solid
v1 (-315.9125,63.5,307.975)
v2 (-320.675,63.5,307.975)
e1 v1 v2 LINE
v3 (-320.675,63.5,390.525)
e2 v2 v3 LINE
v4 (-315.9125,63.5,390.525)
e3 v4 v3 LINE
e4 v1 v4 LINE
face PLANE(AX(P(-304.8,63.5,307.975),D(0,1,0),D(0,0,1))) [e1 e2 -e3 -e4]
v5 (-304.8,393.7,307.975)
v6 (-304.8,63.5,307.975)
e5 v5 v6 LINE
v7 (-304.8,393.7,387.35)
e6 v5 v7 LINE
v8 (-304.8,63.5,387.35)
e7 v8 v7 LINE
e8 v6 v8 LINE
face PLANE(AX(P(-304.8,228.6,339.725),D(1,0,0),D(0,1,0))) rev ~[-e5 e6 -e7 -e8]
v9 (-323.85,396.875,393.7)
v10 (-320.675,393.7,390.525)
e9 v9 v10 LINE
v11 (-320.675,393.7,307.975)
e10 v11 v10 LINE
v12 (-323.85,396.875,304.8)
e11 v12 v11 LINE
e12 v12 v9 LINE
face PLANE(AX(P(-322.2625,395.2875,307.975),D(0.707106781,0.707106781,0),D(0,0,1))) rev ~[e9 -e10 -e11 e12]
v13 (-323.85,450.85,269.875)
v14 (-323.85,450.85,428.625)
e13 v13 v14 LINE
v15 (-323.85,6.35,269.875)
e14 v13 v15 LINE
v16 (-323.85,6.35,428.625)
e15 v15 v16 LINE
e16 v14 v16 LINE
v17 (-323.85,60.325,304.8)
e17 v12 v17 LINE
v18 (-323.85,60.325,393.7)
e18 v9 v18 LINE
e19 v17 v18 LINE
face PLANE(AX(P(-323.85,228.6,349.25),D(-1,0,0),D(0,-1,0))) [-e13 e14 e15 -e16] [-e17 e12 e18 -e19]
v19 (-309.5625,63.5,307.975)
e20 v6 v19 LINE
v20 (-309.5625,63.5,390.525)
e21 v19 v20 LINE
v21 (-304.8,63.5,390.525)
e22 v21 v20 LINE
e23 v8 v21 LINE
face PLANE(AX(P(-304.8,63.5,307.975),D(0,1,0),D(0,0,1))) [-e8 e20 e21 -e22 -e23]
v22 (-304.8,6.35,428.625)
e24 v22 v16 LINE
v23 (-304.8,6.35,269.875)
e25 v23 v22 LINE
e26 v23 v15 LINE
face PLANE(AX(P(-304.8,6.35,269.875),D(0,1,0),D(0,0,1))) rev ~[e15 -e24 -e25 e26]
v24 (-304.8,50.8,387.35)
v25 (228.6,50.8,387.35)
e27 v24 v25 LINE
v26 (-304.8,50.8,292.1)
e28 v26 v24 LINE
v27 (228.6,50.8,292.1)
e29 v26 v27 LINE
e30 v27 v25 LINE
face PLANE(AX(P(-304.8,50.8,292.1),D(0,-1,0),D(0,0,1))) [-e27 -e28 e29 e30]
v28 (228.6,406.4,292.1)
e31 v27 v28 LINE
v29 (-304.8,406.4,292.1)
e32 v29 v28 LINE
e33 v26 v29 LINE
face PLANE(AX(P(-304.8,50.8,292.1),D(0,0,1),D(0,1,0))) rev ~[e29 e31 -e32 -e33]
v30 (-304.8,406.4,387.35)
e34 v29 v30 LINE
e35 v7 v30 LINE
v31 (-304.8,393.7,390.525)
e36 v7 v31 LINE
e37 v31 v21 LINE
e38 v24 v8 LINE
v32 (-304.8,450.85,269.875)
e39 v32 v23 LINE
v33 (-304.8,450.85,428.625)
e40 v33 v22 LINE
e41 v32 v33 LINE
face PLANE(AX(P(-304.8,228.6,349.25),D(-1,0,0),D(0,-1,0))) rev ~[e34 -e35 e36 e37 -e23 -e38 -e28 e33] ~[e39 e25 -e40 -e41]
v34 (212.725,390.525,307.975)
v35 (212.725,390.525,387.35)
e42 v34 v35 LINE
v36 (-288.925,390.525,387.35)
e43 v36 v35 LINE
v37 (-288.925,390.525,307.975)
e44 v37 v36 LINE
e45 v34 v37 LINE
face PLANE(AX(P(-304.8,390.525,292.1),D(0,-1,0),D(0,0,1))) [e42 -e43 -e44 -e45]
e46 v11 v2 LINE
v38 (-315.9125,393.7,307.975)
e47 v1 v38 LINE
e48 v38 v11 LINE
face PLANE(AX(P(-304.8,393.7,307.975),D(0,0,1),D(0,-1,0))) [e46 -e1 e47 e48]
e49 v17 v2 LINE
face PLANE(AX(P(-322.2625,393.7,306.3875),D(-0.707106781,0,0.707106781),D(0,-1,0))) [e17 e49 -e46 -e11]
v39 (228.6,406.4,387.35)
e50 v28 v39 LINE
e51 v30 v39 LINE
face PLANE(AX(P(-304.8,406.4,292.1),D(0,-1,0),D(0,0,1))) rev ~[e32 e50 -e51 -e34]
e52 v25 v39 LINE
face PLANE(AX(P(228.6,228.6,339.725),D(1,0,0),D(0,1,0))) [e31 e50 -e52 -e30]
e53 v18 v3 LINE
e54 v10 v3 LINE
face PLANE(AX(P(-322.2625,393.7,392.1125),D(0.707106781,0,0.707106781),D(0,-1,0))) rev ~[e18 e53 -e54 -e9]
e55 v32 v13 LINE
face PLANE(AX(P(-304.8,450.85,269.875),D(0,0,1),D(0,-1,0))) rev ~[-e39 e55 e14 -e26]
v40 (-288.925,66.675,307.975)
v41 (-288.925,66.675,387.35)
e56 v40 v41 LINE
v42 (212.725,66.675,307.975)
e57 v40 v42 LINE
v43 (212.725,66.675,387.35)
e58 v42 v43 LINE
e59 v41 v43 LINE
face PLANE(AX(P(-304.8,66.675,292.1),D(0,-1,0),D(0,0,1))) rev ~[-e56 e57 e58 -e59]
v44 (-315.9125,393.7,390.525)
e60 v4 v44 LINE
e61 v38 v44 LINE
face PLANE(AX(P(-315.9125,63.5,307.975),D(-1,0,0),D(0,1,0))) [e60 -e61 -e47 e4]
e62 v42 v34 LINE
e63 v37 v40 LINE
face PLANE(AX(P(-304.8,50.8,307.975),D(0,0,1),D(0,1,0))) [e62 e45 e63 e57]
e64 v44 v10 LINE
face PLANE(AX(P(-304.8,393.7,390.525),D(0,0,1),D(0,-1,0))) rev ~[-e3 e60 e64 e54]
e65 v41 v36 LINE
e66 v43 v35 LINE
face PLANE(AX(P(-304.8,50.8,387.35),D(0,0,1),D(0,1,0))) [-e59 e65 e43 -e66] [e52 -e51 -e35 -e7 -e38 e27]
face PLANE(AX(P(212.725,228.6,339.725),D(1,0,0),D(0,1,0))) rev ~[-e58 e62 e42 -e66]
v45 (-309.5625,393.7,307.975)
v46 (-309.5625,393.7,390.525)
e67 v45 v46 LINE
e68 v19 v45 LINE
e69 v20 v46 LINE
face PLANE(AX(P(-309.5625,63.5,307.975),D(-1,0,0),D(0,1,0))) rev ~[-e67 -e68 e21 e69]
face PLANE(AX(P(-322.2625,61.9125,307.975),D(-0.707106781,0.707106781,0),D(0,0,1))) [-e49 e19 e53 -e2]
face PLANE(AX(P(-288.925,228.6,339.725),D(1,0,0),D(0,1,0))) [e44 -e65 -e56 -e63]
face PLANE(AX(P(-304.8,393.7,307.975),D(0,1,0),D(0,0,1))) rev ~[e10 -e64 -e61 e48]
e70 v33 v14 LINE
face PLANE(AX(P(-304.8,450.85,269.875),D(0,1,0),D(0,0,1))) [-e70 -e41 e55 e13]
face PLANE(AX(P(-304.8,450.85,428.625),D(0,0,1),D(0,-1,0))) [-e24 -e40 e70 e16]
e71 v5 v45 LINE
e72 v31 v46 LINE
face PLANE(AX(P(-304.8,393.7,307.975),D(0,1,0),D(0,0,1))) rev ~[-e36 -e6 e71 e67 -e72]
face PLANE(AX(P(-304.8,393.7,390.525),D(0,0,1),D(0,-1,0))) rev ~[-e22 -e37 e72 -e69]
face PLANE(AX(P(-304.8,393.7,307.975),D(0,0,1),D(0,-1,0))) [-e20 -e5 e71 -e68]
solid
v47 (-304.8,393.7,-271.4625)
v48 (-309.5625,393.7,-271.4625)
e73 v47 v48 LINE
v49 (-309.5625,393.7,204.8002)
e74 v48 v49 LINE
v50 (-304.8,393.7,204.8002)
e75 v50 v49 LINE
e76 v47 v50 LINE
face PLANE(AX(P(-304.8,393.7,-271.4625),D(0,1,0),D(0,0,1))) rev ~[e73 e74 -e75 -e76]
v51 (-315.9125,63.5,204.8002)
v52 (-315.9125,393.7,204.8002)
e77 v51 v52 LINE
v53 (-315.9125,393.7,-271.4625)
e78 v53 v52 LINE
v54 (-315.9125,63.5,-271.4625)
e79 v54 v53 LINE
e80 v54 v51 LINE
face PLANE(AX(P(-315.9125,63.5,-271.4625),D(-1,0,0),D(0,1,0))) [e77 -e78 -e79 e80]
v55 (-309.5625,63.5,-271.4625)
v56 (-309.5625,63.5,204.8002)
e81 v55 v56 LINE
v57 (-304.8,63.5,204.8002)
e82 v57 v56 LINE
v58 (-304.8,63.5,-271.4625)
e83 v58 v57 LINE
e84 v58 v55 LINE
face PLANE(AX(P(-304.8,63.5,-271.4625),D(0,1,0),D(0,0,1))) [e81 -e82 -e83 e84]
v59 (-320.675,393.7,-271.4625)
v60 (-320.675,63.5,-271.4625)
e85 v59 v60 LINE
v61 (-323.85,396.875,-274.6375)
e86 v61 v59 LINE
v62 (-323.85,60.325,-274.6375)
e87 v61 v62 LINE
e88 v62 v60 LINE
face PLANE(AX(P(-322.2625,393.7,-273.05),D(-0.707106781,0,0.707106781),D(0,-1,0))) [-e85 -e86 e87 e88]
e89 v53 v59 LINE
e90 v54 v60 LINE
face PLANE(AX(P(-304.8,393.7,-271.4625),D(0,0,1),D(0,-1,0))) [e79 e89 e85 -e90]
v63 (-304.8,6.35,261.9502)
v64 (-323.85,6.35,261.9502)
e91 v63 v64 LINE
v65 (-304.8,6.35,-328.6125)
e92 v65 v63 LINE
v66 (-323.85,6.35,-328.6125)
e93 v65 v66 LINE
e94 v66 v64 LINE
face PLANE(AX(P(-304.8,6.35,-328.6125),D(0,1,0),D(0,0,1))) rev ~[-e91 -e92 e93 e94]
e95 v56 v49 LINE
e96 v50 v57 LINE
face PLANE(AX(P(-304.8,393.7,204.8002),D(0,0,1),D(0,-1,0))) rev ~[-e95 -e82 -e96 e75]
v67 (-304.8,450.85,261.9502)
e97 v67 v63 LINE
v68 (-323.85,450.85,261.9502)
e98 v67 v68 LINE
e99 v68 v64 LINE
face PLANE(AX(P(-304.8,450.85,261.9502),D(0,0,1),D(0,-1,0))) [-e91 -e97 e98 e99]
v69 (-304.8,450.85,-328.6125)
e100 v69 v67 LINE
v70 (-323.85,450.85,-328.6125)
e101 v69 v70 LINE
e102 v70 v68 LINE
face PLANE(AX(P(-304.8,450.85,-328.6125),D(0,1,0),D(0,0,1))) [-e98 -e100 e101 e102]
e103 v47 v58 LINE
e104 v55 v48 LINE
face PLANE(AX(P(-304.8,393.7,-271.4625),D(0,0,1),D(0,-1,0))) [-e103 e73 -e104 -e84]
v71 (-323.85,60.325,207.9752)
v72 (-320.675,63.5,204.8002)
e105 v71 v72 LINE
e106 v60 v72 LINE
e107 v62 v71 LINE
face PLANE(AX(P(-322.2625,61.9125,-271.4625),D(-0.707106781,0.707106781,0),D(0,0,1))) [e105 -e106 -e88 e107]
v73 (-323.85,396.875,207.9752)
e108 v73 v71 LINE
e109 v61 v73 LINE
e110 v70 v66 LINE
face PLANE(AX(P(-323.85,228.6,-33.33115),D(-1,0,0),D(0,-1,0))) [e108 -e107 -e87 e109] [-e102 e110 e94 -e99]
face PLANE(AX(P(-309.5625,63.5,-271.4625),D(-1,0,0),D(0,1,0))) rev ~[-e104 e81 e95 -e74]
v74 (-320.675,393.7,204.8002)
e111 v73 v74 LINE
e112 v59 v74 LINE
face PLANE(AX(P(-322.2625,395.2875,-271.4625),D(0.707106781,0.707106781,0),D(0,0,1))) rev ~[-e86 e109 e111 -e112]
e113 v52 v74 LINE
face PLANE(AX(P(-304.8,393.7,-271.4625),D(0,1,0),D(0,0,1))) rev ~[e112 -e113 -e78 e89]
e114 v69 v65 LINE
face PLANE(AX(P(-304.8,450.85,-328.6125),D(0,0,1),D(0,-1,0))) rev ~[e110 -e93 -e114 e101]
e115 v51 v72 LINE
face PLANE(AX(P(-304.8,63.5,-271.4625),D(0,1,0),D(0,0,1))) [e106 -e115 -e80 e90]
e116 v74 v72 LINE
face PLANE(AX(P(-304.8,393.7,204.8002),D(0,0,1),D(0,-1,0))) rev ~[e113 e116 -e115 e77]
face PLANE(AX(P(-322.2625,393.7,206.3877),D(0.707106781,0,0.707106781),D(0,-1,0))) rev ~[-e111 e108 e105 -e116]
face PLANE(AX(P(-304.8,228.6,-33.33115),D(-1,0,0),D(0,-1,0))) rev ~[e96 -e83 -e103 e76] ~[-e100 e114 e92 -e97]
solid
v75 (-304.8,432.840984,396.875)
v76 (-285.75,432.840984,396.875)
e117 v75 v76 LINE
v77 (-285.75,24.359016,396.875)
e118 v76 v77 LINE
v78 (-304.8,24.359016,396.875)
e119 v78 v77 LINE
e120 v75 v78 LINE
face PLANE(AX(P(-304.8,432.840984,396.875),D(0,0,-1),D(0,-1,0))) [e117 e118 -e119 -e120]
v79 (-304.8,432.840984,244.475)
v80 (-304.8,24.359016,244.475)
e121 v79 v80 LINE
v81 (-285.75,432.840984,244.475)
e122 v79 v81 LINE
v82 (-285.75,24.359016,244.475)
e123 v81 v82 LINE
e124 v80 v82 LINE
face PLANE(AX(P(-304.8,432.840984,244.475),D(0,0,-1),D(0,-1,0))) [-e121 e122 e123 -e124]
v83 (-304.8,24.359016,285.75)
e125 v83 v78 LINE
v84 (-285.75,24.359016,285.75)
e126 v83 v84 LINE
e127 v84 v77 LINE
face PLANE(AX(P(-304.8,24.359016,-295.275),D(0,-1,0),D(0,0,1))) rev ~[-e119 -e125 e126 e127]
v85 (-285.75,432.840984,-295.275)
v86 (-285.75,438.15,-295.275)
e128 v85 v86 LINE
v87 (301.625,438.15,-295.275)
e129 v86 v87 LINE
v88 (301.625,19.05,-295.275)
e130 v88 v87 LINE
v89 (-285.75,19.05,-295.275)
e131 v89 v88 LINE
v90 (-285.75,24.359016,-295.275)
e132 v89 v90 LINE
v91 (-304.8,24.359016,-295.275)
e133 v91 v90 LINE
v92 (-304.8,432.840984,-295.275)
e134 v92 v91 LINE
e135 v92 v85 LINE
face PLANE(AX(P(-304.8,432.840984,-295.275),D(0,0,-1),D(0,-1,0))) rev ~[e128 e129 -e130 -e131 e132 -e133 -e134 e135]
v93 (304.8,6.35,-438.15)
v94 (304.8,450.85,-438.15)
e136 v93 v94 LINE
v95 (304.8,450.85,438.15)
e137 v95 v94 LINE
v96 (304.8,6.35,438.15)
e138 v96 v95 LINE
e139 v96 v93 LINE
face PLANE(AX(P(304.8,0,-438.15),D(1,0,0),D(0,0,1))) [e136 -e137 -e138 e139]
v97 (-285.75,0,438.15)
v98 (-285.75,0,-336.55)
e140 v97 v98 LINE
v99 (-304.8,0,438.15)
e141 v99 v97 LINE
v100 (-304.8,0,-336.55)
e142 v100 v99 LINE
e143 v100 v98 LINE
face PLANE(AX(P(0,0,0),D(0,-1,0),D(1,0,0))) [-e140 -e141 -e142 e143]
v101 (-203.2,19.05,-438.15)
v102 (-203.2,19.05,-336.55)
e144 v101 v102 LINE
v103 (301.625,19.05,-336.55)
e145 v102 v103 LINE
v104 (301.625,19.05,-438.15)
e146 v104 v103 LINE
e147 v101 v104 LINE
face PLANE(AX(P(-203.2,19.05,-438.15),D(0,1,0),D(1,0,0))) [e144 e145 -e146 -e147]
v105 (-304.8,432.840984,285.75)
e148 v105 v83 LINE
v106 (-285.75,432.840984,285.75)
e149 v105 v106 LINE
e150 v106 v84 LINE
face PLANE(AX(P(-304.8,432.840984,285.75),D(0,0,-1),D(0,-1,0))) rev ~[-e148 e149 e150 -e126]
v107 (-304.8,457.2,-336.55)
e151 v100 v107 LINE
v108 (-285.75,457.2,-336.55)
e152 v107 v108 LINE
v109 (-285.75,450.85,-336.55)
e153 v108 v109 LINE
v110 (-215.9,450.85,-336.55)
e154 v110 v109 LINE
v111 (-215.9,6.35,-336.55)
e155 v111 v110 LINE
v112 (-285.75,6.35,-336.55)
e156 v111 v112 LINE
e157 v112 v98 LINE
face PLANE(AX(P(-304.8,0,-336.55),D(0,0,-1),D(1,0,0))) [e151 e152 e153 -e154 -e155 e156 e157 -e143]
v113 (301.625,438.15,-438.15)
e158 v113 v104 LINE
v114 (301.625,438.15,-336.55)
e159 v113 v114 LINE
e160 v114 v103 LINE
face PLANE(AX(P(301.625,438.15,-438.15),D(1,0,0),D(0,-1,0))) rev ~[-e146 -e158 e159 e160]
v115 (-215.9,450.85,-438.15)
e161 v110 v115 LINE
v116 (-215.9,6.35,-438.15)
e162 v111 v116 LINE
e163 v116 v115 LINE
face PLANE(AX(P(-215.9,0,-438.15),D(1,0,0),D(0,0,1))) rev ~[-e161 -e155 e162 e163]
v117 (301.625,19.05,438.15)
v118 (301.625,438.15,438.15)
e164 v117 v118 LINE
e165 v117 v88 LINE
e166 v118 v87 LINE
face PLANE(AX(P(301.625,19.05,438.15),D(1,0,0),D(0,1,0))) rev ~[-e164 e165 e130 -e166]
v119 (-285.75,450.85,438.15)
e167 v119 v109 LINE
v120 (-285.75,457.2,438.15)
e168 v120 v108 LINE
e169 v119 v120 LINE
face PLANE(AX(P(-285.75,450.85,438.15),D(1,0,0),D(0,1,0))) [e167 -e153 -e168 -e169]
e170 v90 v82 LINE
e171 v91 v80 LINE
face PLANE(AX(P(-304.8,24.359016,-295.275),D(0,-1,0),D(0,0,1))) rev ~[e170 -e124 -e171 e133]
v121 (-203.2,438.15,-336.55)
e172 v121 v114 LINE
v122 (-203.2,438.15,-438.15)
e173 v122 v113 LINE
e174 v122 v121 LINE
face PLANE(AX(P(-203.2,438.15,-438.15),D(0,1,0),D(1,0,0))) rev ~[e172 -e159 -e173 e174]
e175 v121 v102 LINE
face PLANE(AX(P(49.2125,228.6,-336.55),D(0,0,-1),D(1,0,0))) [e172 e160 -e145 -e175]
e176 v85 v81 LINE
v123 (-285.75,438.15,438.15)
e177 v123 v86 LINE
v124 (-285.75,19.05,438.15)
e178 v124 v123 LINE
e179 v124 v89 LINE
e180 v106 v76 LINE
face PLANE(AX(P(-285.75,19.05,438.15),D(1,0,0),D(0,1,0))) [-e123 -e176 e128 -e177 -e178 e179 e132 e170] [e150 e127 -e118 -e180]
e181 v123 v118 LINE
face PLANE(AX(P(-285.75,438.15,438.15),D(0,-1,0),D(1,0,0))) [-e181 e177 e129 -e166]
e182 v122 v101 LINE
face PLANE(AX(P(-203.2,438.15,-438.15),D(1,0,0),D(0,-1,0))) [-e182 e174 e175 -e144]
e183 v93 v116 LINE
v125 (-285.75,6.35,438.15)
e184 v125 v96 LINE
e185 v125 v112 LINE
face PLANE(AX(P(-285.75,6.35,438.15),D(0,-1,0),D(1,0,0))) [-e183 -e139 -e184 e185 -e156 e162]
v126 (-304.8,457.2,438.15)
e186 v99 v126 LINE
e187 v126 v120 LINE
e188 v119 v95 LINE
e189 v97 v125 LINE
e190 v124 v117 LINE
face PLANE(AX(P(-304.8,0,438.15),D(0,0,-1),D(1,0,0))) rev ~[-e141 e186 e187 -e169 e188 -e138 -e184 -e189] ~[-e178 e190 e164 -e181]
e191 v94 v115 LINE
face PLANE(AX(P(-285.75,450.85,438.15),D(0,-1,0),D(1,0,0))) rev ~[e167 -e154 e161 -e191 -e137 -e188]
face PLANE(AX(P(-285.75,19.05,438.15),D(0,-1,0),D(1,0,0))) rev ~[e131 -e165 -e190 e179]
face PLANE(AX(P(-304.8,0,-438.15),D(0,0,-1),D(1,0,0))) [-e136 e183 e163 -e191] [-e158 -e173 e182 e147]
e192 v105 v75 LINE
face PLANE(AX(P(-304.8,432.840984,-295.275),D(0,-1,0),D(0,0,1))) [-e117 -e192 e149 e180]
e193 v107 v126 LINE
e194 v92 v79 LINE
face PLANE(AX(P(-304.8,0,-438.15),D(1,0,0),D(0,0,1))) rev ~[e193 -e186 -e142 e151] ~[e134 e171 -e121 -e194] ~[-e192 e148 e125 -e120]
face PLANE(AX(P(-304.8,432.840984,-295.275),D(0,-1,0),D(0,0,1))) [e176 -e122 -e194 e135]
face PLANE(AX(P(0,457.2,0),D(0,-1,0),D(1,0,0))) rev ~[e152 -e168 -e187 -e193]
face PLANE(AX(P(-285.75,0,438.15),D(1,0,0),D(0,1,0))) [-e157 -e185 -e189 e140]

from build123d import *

# Parameters (mm, degrees)
F0_W          = 609.6
F0_H          = 876.3
F1_DEPTH      = 457.2
F2_W          = 88.9
F2_H          = 101.6
F3_DEPTH      = 457.201
F4_W          = 408.4819672131
F4_H          = 692.15
F5_DEPTH      = 19.05
F6_W          = 590.55
F6_H          = 6.35
F7_DEPTH      = 876.301
F8_W          = 587.375
F8_H          = 419.1
F9_DEPTH      = 733.425
F10_W         = 408.4819672131
F10_H         = 41.275
F11_DEPTH     = 19.05
F12_W         = 444.5
F12_H         = 590.5627
F12_W_2       = 330.2
F12_H_2       = 476.2627
F13_DEPTH     = 19.05
F14_W         = 6.35
F14_H         = 330.2
F15_DEPTH     = 476.2627
F16_SIZE      = 3.175
F17_W         = 444.5
F17_H         = 158.75
F17_W_2       = 330.2
F17_H_2       = 82.55
F18_DEPTH     = 19.05
F19_W         = 6.35
F19_H         = 330.2
F20_DEPTH     = 82.55
F21_SIZE      = 3.175
F22_W         = 504.825
F22_H         = 419.1
F23_DEPTH     = 101.6
F24_W         = 355.6
F24_H         = 95.25
F25_DEPTH     = 533.4
F26_T         = 15.875
F26_T3_DEPTH  = 37.249261314
F26_T5_DEPTH  = 37.249261314
F26_T7_DEPTH  = 37.249261314
F26_T9_DEPTH  = 37.249261314
F26_T11_DEPTH = 36.5125
F26_T13_DEPTH = 361.95
F26_T15_DEPTH = 114.3
F26_T17_DEPTH = 127
F26_T19_DEPTH = 387.35
F26_T21_DEPTH = 111.125
F26_T23_DEPTH = 36.5125


# Not quite as in the source:
# - a shell that OpenCascade refuses in one call is made with other operations: the cavity is built on its own and cut out


with BuildPart() as f1:
    # F0 (on Front) → F1 (new body)
    with BuildSketch(Plane.XZ):
        Rectangle(F0_W, F0_H)
    extrude(amount=-F1_DEPTH)

    # F2 (on face) → F3 (cut, through all)
    with BuildSketch(Plane.XZ):
        with Locations((-260.35, -387.35)):
            Rectangle(F2_W, F2_H)
    extrude(amount=-F3_DEPTH, mode=Mode.SUBTRACT)

    # F4 (on face) → F5 (cut)
    with BuildSketch(Plane(origin=(-304.8, 0, 0), x_dir=(0, -1, 0), z_dir=(-1, 0, 0))):
        with Locations((-228.6, 50.8)):
            Rectangle(F4_W, F4_H)
    extrude(amount=-F5_DEPTH, mode=Mode.SUBTRACT)

    # F6 (on face) → F7 (cut, through all)
    with BuildSketch(Plane.XY.offset(438.15)):
        with Locations((9.525, 454.025)):
            Rectangle(F6_W, F6_H)
        with Locations((9.525, 3.175)):
            Rectangle(F6_W, F6_H)
    extrude(amount=-F7_DEPTH, mode=Mode.SUBTRACT)

    # F8 (on face) → F9 (cut, through all)
    with BuildSketch(Plane.XY.offset(438.15)):
        with Locations((7.9375, 228.6)):
            Rectangle(F8_W, F8_H)
    extrude(amount=-F9_DEPTH, mode=Mode.SUBTRACT)

    # F10 (on face) → F11 (join, through all)
    with BuildSketch(Plane(origin=(-304.8, 0, 0), x_dir=(0, -1, 0), z_dir=(-1, 0, 0))):
        with Locations((-228.6, 265.1125)):
            Rectangle(F10_W, F10_H)
    extrude(amount=-F11_DEPTH)

    # F22 (on face) → F23 (cut)
    with BuildSketch(Plane(origin=(0, 0, -438.15), x_dir=(1, 0, 0), z_dir=(0, 0, -1))):
        with Locations((49.2125, -228.6)):
            Rectangle(F22_W, F22_H)
    extrude(amount=-F23_DEPTH, mode=Mode.SUBTRACT)


with BuildPart() as f13:
    # F12 (on face) → F13 (new body)
    with BuildSketch(Plane(origin=(-304.8, 0, 0), x_dir=(0, -1, 0), z_dir=(-1, 0, 0))):
        with Locations((-228.6, -33.33115)):
            Rectangle(F12_W, F12_H)
        with Locations((-228.6, -33.33115)):
            Rectangle(F12_W_2, F12_H_2, mode=Mode.SUBTRACT)
    extrude(amount=F13_DEPTH)

    # F14 (on face) → F15 (join, through all)
    with BuildSketch(Plane.XY.offset(-271.4625)):
        with Locations((-312.7375, 228.6)):
            Rectangle(F14_W, F14_H)
    extrude(amount=F15_DEPTH)

    # F16
    f16_edges = [f13.edges().sort_by_distance(p)[0] for p in [
        (-323.85, 393.7, -33.33115),
        (-323.85, 228.6, -271.4625),
        (-323.85, 63.5, -33.33115),
        (-323.85, 228.6, 204.8002),
    ]]
    chamfer(f16_edges, length=F16_SIZE)


with BuildPart() as f18:
    # F17 (on face) → F18 (new body)
    with BuildSketch(Plane(origin=(-304.8, 0, 0), x_dir=(0, -1, 0), z_dir=(-1, 0, 0))):
        with Locations((-228.6, 349.25)):
            Rectangle(F17_W, F17_H)
        with Locations((-228.6, 349.25)):
            Rectangle(F17_W_2, F17_H_2, mode=Mode.SUBTRACT)
    extrude(amount=F18_DEPTH)

    # F19 (on face) → F20 (join, through all)
    with BuildSketch(Plane.XY.offset(307.975)):
        with Locations((-312.7375, 228.6)):
            Rectangle(F19_W, F19_H)
    extrude(amount=F20_DEPTH)

    # F21
    f21_edges = [f18.edges().sort_by_distance(p)[0] for p in [
        (-323.85, 228.6, 307.975),
        (-323.85, 393.7, 349.25),
        (-323.85, 228.6, 390.525),
        (-323.85, 63.5, 349.25),
    ]]
    chamfer(f21_edges, length=F21_SIZE)

    # F24 (on face) → F25 (join)
    with BuildSketch(Plane.YZ.offset(-304.8)):
        with Locations((228.6, 339.725)):
            Rectangle(F24_W, F24_H)
    extrude(amount=F25_DEPTH)

    # F26: shell of thickness 15.875, made by hand


with BuildPart() as f26_core1:
    # F26_t2: copy of F18
    add(f18.part)

    # the walls: a layer under each face that stays
    f26_faces = [f26_core1.faces().sort_by_distance(p)[0] for p in [
        (-323.85, 376.7666666667, 296.3333333333),
        (-322.2625, 228.6, 306.3875),
        (-322.2625, 61.9125, 349.25),
        (-322.2625, 395.2875, 349.25),
        (-322.2625, 228.6, 392.1125),
        (-314.325, 228.6, 428.625),
        (-314.325, 450.85, 349.25),
        (-314.325, 228.6, 269.875),
        (-314.325, 6.35, 349.25),
        (-318.29375, 228.6, 307.975),
        (-318.29375, 63.5, 349.25),
        (-318.29375, 393.7, 349.25),
        (-318.29375, 228.6, 390.525),
        (-304.8, 376.7666666667, 402.1666666667),
        (-315.9125, 228.6, 349.25),
        (-38.1, 406.4, 339.725),
        (-38.1, 228.6, 292.1),
        (-38.1, 50.8, 339.725),
        (-307.18125, 63.5, 349.25),
        (-307.18125, 228.6, 390.525),
        (-307.18125, 393.7, 349.25),
        (-304.8, 228.6, 347.6625),
        (228.6, 228.6, 339.725),
        (-307.18125, 228.6, 307.975),
        (-309.5625, 228.6, 349.25),
    ]]
    thicken(f26_faces, amount=-F26_T, mode=Mode.SUBTRACT)

    # F26_s4 → F26_t3 (cut)
    with BuildSketch(Plane(origin=(4.5928978099, 4.5928978099, 4.5928978099), x_dir=(-0.7071067812, 0.7071067812, 0), z_dir=(0.5773502692, 0.5773502692, 0.5773502692))):
        Polygon((271.8908726623, 356.5892701441), (263.7152476623, 342.7036353262), (255.7777476623, 347.2863530879), (255.7777476623, 356.4517886113), align=None)
    extrude(amount=F26_T3_DEPTH, mode=Mode.SUBTRACT)

    # F26_s6 → F26_t5 (cut)
    with BuildSketch(Plane(origin=(-147.8071021901, 147.8071021901, -147.8071021901), x_dir=(0.7071067812, 0.7071067812, 0), z_dir=(0.5773502692, -0.5773502692, 0.5773502692))):
        Polygon((51.3983476961, 543.2403885442), (59.5739726961, 529.3547537263), (67.5114726961, 533.937471488), (67.5114726961, 543.1029070113), align=None)
    extrude(amount=F26_T5_DEPTH, mode=Mode.SUBTRACT)

    # F26_s8 → F26_t7 (cut)
    with BuildSketch(Plane(origin=(-228.2404355234, -228.2404355234, 228.2404355234), x_dir=(-0.7071067812, 0.7071067812, 0), z_dir=(0.5773502692, 0.5773502692, -0.5773502692))):
        Polygon((271.8908726623, 213.7335916339), (255.7777476623, 213.8710731668), (255.7777476623, 223.0365086901), (263.7152476623, 227.6192264518), align=None)
    extrude(amount=F26_T7_DEPTH, mode=Mode.SUBTRACT)

    # F26_s10 → F26_t9 (cut)
    with BuildSketch(Plane(origin=(-380.6404355234, 380.6404355234, 380.6404355234), x_dir=(0.7071067812, 0.7071067812, 0), z_dir=(0.5773502692, -0.5773502692, -0.5773502692))):
        Polygon((51.3983476961, 27.0824732338), (67.5114726961, 27.2199547667), (67.5114726961, 36.3853902901), (59.5739726961, 40.9681080518), align=None)
    extrude(amount=F26_T9_DEPTH, mode=Mode.SUBTRACT)

    # F26_s12 → F26_t11 (cut)
    with BuildSketch(Plane.YZ.offset(-336.55)):
        Polygon((393.54125, 308.13375), (393.7, 292.1), (409.575, 292.1), (409.575, 307.975), align=None)
        Polygon((63.65875, 308.13375), (63.5, 292.1), (47.625, 292.1), (47.625, 307.975), align=None)
        Polygon((63.65875, 390.36625), (47.625, 390.525), (47.625, 406.4), (63.5, 406.4), align=None)
        Polygon((393.54125, 390.36625), (409.575, 390.525), (409.575, 406.4), (393.7, 406.4), align=None)
    extrude(amount=F26_T11_DEPTH, mode=Mode.SUBTRACT)

    # F26_s14 → F26_t13 (cut)
    with BuildSketch(Plane.XZ.offset(-409.575)):
        Polygon((-316.07125, 308.13375), (-315.9125, 292.1), (-300.0375, 292.1), (-300.0375, 307.975), align=None)
        Polygon((-316.07125, 390.36625), (-315.9125, 406.4), (-300.0375, 406.4), (-300.0375, 390.525), align=None)
        Polygon((-309.40375, 390.36625), (-309.5625, 406.4), (-325.4375, 406.4), (-325.4375, 390.525), align=None)
        Polygon((-304.95875, 308.13375), (-288.925, 307.975), (-288.925, 292.1), (-304.8, 292.1), align=None)
        Polygon((-309.40375, 308.13375), (-309.5625, 292.1), (-325.4375, 292.1), (-325.4375, 307.975), align=None)
    extrude(amount=F26_T13_DEPTH, mode=Mode.SUBTRACT)

    # F26_s16 → F26_t15 (cut)
    with BuildSketch(Plane.XY.offset(292.1)):
        Polygon((-316.07125, 63.65875), (-315.9125, 47.625), (-300.0375, 47.625), (-300.0375, 63.5), align=None)
        Polygon((-316.07125, 393.54125), (-315.9125, 409.575), (-300.0375, 409.575), (-300.0375, 393.7), align=None)
        Polygon((-309.40375, 63.65875), (-309.5625, 47.625), (-325.4375, 47.625), (-325.4375, 63.5), align=None)
        Polygon((-309.40375, 393.54125), (-309.5625, 409.575), (-325.4375, 409.575), (-325.4375, 393.7), align=None)
    extrude(amount=F26_T15_DEPTH, mode=Mode.SUBTRACT)

    # F26_s18 → F26_t17 (cut)
    with BuildSketch(Plane.XY.offset(276.225)):
        Polygon((-304.64125, 406.55875), (-320.675, 406.4), (-320.675, 390.525), (-304.8, 390.525), align=None)
        Polygon((-304.64125, 50.64125), (-320.675, 50.8), (-320.675, 66.675), (-304.8, 66.675), align=None)
    extrude(amount=F26_T17_DEPTH, mode=Mode.SUBTRACT)

    # F26_s20 → F26_t19 (cut)
    with BuildSketch(Plane.XZ.offset(-422.275)):
        Polygon((-304.64125, 291.94125), (-320.675, 292.1), (-320.675, 307.975), (-304.8, 307.975), align=None)
    extrude(amount=F26_T19_DEPTH, mode=Mode.SUBTRACT)

    # F26_s22 → F26_t21 (cut)
    with BuildSketch(Plane.XY.offset(292.1)):
        Polygon((-304.95875, 63.65875), (-304.8, 47.625), (-288.925, 47.625), (-288.925, 63.5), align=None)
        Polygon((-304.95875, 393.54125), (-304.8, 409.575), (-288.925, 409.575), (-288.925, 393.7), align=None)
    extrude(amount=F26_T21_DEPTH, mode=Mode.SUBTRACT)

    # F26_s24 → F26_t23 (cut)
    with BuildSketch(Plane.YZ.offset(-325.4375)):
        Polygon((63.65875, 308.13375), (47.625, 307.975), (47.625, 292.1), (63.5, 292.1), align=None)
        Polygon((63.65875, 390.36625), (47.625, 390.525), (47.625, 406.4), (63.5, 406.4), align=None)
        Polygon((393.54125, 390.36625), (393.7, 406.4), (409.575, 406.4), (409.575, 390.525), align=None)
        Polygon((393.54125, 308.13375), (409.575, 307.975), (409.575, 292.1), (393.7, 292.1), align=None)
    extrude(amount=F26_T23_DEPTH, mode=Mode.SUBTRACT)


with BuildPart() as f18_1:
    add(f18.part)

    # what is left inside the walls is the cavity
    f26_cavity = [f26_core1.part.solids().sort_by_distance(p)[0] for p in [
        (45.508333, 228.6, 308.13375),
    ]]
    add(f26_cavity, mode=Mode.SUBTRACT)


solid = Compound([f1.part, f13.part, f18_1.part])
